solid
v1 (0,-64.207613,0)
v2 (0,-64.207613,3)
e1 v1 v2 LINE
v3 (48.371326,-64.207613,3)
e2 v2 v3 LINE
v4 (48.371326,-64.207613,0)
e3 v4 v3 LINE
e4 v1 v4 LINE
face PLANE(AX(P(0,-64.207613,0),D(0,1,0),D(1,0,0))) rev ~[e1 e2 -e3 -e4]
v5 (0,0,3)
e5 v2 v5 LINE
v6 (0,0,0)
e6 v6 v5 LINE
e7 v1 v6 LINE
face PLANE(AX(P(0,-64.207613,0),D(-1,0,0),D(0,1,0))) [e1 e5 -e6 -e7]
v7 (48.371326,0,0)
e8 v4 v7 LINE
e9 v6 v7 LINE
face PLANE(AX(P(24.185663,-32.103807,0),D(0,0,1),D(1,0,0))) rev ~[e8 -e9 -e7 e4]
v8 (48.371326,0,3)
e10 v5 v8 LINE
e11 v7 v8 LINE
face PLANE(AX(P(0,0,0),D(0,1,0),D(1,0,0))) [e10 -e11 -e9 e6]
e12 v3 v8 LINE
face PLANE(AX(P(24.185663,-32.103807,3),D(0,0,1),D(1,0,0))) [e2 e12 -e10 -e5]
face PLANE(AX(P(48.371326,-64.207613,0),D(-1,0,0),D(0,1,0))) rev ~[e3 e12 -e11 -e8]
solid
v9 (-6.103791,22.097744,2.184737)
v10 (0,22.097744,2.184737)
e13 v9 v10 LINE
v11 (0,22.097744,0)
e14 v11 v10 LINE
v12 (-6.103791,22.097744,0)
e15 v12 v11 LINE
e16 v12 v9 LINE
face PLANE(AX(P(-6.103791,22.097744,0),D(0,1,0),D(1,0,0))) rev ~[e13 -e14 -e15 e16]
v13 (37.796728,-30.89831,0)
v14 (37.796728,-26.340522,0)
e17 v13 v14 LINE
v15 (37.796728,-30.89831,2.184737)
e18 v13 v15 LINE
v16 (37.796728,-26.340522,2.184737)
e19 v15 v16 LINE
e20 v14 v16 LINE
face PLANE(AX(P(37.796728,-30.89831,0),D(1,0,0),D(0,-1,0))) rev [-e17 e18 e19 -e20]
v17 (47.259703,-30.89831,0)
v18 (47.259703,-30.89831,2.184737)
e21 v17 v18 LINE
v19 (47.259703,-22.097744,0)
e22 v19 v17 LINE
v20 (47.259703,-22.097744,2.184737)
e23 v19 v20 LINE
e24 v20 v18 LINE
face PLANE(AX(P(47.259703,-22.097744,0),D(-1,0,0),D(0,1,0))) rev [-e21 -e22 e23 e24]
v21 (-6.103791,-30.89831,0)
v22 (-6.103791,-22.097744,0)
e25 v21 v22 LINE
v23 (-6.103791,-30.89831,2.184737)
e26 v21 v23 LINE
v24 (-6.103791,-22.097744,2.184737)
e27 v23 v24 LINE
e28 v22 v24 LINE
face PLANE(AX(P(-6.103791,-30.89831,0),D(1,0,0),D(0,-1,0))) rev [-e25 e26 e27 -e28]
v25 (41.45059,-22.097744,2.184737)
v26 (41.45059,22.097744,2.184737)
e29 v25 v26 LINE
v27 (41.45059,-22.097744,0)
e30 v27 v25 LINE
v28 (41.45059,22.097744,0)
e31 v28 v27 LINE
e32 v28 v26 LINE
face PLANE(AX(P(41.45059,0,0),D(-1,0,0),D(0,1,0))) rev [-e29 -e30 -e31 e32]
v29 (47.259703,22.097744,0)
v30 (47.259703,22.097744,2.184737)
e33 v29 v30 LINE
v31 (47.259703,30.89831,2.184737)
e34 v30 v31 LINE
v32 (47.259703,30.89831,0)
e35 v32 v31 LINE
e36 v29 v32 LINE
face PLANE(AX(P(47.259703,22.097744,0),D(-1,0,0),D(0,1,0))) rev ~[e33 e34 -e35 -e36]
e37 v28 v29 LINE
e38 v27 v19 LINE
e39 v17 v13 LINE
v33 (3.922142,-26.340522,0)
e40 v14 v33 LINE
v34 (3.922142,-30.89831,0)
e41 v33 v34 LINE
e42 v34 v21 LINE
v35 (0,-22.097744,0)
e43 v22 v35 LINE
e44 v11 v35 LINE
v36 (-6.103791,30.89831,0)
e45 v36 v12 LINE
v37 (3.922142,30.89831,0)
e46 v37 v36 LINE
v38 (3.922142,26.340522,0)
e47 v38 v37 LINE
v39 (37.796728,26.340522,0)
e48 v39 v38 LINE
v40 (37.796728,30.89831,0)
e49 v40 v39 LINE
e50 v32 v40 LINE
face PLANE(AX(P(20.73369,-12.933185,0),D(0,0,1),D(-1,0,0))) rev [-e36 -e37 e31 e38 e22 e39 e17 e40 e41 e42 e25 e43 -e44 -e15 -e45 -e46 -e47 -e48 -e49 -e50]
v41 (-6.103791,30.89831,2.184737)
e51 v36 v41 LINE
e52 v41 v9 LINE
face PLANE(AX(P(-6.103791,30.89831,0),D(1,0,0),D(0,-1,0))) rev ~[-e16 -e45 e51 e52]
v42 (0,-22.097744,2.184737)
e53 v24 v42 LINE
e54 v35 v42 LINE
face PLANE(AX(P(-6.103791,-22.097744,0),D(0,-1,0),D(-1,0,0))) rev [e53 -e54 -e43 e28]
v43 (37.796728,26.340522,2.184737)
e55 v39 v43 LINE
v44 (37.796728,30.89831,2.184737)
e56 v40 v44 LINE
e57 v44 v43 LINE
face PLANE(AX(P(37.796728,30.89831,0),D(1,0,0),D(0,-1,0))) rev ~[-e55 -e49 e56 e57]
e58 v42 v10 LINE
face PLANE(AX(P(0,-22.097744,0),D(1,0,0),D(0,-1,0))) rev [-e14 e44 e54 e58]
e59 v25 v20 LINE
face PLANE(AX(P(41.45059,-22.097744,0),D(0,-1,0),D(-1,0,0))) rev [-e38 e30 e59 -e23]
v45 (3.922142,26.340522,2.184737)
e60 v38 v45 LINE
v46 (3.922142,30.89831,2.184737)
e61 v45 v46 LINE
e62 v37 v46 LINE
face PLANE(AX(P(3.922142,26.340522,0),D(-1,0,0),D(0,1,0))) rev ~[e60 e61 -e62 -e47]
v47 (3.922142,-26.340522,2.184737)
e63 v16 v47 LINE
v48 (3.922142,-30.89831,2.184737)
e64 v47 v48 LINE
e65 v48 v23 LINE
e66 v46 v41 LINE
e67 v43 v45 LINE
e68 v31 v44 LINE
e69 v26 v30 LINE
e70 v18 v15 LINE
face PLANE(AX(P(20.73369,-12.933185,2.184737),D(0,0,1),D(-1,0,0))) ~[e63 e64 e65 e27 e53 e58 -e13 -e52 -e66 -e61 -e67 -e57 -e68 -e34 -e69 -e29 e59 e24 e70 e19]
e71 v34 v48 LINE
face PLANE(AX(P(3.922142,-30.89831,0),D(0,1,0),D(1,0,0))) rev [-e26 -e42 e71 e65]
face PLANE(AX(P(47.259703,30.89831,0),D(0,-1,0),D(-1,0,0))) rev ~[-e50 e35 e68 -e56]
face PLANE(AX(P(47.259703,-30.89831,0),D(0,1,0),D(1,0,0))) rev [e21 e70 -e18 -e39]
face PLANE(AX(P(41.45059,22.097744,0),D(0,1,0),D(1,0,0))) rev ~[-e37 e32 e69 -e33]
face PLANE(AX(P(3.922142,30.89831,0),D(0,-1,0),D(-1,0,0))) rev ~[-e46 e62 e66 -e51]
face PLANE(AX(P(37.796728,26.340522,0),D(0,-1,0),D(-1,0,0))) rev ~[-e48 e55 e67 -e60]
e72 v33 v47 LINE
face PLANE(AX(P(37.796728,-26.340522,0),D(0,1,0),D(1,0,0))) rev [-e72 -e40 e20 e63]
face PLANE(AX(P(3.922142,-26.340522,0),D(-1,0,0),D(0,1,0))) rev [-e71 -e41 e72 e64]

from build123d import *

# Parameters (mm, degrees)
F0_W     = 48.3713261783
F0_H     = 64.2076134682
F1_DEPTH = 3
F0_W_2   = 12.6881040633
F0_H_2   = 12.7290943637
F4_W     = 3.9221420884
F4_H     = 4.2427778244
F4_W_2   = 3.6538615823
F5_DEPTH = 2.1847370081


with BuildPart() as f1:
    # F0 (on Top) → F1 (new body)
    with BuildSketch(Plane.XY):
        with Locations((24.1856630892, -32.1038067341)):
            Rectangle(F0_W, F0_H)
    extrude(amount=F1_DEPTH)


with BuildPart() as f1b:
    # F0 (on Top) → F1, piece 2 (new body)
    with BuildSketch(Plane.XY):
        Polygon((60.9453171492, -64.2076134682), (48.3713261783, -64.2076134682), (48.8873720169, -77.1873742342), (60.9453171492, -77.1873742342), align=None)
    extrude(amount=F1_DEPTH)


with BuildPart() as f1c:
    # F0 (on Top) → F1, piece 3 (new body)
    with BuildSketch(Plane.XY):
        with Locations((54.7153782099, 6.3645471819)):
            Rectangle(F0_W_2, F0_H_2)
    extrude(amount=F1_DEPTH)


with BuildPart() as f5:
    # F4 (on Top) → F5 (new body)
    with BuildSketch(Plane.XY):
        Polygon((0, 22.0977440476), (0, 0), (41.4505898952, 0), (41.4505898952, 22.0977440476), (37.796728313, 22.0977440476), (37.796728313, 26.340521872), (3.9221420884, 26.340521872), (3.9221420884, 22.0977440476), align=None)
        Polygon((-6.1037912965, 22.0977440476), (0, 22.0977440476), (0, 26.340521872), (3.9221420884, 26.340521872), (3.9221420884, 30.8983102441), (-6.1037912965, 30.8983102441), align=None)
        with Locations((1.9610710442, 24.2191329598)):
            Rectangle(F4_W, F4_H)
        with Locations((39.6236591041, 24.2191329598)):
            Rectangle(F4_W_2, F4_H)
        Polygon((41.4505898952, 26.340521872), (41.4505898952, 22.0977440476), (47.2597032785, 22.0977440476), (47.2597032785, 30.8983102441), (37.796728313, 30.8983102441), (37.796728313, 26.340521872), align=None)
    extrude(amount=F5_DEPTH)

    # F8: F5 across plane


with BuildPart() as f5_1:
    add(f5.part)
    add(f5.part.mirror(Plane.XZ))


solid = Compound([f1.part, f5_1.part])
